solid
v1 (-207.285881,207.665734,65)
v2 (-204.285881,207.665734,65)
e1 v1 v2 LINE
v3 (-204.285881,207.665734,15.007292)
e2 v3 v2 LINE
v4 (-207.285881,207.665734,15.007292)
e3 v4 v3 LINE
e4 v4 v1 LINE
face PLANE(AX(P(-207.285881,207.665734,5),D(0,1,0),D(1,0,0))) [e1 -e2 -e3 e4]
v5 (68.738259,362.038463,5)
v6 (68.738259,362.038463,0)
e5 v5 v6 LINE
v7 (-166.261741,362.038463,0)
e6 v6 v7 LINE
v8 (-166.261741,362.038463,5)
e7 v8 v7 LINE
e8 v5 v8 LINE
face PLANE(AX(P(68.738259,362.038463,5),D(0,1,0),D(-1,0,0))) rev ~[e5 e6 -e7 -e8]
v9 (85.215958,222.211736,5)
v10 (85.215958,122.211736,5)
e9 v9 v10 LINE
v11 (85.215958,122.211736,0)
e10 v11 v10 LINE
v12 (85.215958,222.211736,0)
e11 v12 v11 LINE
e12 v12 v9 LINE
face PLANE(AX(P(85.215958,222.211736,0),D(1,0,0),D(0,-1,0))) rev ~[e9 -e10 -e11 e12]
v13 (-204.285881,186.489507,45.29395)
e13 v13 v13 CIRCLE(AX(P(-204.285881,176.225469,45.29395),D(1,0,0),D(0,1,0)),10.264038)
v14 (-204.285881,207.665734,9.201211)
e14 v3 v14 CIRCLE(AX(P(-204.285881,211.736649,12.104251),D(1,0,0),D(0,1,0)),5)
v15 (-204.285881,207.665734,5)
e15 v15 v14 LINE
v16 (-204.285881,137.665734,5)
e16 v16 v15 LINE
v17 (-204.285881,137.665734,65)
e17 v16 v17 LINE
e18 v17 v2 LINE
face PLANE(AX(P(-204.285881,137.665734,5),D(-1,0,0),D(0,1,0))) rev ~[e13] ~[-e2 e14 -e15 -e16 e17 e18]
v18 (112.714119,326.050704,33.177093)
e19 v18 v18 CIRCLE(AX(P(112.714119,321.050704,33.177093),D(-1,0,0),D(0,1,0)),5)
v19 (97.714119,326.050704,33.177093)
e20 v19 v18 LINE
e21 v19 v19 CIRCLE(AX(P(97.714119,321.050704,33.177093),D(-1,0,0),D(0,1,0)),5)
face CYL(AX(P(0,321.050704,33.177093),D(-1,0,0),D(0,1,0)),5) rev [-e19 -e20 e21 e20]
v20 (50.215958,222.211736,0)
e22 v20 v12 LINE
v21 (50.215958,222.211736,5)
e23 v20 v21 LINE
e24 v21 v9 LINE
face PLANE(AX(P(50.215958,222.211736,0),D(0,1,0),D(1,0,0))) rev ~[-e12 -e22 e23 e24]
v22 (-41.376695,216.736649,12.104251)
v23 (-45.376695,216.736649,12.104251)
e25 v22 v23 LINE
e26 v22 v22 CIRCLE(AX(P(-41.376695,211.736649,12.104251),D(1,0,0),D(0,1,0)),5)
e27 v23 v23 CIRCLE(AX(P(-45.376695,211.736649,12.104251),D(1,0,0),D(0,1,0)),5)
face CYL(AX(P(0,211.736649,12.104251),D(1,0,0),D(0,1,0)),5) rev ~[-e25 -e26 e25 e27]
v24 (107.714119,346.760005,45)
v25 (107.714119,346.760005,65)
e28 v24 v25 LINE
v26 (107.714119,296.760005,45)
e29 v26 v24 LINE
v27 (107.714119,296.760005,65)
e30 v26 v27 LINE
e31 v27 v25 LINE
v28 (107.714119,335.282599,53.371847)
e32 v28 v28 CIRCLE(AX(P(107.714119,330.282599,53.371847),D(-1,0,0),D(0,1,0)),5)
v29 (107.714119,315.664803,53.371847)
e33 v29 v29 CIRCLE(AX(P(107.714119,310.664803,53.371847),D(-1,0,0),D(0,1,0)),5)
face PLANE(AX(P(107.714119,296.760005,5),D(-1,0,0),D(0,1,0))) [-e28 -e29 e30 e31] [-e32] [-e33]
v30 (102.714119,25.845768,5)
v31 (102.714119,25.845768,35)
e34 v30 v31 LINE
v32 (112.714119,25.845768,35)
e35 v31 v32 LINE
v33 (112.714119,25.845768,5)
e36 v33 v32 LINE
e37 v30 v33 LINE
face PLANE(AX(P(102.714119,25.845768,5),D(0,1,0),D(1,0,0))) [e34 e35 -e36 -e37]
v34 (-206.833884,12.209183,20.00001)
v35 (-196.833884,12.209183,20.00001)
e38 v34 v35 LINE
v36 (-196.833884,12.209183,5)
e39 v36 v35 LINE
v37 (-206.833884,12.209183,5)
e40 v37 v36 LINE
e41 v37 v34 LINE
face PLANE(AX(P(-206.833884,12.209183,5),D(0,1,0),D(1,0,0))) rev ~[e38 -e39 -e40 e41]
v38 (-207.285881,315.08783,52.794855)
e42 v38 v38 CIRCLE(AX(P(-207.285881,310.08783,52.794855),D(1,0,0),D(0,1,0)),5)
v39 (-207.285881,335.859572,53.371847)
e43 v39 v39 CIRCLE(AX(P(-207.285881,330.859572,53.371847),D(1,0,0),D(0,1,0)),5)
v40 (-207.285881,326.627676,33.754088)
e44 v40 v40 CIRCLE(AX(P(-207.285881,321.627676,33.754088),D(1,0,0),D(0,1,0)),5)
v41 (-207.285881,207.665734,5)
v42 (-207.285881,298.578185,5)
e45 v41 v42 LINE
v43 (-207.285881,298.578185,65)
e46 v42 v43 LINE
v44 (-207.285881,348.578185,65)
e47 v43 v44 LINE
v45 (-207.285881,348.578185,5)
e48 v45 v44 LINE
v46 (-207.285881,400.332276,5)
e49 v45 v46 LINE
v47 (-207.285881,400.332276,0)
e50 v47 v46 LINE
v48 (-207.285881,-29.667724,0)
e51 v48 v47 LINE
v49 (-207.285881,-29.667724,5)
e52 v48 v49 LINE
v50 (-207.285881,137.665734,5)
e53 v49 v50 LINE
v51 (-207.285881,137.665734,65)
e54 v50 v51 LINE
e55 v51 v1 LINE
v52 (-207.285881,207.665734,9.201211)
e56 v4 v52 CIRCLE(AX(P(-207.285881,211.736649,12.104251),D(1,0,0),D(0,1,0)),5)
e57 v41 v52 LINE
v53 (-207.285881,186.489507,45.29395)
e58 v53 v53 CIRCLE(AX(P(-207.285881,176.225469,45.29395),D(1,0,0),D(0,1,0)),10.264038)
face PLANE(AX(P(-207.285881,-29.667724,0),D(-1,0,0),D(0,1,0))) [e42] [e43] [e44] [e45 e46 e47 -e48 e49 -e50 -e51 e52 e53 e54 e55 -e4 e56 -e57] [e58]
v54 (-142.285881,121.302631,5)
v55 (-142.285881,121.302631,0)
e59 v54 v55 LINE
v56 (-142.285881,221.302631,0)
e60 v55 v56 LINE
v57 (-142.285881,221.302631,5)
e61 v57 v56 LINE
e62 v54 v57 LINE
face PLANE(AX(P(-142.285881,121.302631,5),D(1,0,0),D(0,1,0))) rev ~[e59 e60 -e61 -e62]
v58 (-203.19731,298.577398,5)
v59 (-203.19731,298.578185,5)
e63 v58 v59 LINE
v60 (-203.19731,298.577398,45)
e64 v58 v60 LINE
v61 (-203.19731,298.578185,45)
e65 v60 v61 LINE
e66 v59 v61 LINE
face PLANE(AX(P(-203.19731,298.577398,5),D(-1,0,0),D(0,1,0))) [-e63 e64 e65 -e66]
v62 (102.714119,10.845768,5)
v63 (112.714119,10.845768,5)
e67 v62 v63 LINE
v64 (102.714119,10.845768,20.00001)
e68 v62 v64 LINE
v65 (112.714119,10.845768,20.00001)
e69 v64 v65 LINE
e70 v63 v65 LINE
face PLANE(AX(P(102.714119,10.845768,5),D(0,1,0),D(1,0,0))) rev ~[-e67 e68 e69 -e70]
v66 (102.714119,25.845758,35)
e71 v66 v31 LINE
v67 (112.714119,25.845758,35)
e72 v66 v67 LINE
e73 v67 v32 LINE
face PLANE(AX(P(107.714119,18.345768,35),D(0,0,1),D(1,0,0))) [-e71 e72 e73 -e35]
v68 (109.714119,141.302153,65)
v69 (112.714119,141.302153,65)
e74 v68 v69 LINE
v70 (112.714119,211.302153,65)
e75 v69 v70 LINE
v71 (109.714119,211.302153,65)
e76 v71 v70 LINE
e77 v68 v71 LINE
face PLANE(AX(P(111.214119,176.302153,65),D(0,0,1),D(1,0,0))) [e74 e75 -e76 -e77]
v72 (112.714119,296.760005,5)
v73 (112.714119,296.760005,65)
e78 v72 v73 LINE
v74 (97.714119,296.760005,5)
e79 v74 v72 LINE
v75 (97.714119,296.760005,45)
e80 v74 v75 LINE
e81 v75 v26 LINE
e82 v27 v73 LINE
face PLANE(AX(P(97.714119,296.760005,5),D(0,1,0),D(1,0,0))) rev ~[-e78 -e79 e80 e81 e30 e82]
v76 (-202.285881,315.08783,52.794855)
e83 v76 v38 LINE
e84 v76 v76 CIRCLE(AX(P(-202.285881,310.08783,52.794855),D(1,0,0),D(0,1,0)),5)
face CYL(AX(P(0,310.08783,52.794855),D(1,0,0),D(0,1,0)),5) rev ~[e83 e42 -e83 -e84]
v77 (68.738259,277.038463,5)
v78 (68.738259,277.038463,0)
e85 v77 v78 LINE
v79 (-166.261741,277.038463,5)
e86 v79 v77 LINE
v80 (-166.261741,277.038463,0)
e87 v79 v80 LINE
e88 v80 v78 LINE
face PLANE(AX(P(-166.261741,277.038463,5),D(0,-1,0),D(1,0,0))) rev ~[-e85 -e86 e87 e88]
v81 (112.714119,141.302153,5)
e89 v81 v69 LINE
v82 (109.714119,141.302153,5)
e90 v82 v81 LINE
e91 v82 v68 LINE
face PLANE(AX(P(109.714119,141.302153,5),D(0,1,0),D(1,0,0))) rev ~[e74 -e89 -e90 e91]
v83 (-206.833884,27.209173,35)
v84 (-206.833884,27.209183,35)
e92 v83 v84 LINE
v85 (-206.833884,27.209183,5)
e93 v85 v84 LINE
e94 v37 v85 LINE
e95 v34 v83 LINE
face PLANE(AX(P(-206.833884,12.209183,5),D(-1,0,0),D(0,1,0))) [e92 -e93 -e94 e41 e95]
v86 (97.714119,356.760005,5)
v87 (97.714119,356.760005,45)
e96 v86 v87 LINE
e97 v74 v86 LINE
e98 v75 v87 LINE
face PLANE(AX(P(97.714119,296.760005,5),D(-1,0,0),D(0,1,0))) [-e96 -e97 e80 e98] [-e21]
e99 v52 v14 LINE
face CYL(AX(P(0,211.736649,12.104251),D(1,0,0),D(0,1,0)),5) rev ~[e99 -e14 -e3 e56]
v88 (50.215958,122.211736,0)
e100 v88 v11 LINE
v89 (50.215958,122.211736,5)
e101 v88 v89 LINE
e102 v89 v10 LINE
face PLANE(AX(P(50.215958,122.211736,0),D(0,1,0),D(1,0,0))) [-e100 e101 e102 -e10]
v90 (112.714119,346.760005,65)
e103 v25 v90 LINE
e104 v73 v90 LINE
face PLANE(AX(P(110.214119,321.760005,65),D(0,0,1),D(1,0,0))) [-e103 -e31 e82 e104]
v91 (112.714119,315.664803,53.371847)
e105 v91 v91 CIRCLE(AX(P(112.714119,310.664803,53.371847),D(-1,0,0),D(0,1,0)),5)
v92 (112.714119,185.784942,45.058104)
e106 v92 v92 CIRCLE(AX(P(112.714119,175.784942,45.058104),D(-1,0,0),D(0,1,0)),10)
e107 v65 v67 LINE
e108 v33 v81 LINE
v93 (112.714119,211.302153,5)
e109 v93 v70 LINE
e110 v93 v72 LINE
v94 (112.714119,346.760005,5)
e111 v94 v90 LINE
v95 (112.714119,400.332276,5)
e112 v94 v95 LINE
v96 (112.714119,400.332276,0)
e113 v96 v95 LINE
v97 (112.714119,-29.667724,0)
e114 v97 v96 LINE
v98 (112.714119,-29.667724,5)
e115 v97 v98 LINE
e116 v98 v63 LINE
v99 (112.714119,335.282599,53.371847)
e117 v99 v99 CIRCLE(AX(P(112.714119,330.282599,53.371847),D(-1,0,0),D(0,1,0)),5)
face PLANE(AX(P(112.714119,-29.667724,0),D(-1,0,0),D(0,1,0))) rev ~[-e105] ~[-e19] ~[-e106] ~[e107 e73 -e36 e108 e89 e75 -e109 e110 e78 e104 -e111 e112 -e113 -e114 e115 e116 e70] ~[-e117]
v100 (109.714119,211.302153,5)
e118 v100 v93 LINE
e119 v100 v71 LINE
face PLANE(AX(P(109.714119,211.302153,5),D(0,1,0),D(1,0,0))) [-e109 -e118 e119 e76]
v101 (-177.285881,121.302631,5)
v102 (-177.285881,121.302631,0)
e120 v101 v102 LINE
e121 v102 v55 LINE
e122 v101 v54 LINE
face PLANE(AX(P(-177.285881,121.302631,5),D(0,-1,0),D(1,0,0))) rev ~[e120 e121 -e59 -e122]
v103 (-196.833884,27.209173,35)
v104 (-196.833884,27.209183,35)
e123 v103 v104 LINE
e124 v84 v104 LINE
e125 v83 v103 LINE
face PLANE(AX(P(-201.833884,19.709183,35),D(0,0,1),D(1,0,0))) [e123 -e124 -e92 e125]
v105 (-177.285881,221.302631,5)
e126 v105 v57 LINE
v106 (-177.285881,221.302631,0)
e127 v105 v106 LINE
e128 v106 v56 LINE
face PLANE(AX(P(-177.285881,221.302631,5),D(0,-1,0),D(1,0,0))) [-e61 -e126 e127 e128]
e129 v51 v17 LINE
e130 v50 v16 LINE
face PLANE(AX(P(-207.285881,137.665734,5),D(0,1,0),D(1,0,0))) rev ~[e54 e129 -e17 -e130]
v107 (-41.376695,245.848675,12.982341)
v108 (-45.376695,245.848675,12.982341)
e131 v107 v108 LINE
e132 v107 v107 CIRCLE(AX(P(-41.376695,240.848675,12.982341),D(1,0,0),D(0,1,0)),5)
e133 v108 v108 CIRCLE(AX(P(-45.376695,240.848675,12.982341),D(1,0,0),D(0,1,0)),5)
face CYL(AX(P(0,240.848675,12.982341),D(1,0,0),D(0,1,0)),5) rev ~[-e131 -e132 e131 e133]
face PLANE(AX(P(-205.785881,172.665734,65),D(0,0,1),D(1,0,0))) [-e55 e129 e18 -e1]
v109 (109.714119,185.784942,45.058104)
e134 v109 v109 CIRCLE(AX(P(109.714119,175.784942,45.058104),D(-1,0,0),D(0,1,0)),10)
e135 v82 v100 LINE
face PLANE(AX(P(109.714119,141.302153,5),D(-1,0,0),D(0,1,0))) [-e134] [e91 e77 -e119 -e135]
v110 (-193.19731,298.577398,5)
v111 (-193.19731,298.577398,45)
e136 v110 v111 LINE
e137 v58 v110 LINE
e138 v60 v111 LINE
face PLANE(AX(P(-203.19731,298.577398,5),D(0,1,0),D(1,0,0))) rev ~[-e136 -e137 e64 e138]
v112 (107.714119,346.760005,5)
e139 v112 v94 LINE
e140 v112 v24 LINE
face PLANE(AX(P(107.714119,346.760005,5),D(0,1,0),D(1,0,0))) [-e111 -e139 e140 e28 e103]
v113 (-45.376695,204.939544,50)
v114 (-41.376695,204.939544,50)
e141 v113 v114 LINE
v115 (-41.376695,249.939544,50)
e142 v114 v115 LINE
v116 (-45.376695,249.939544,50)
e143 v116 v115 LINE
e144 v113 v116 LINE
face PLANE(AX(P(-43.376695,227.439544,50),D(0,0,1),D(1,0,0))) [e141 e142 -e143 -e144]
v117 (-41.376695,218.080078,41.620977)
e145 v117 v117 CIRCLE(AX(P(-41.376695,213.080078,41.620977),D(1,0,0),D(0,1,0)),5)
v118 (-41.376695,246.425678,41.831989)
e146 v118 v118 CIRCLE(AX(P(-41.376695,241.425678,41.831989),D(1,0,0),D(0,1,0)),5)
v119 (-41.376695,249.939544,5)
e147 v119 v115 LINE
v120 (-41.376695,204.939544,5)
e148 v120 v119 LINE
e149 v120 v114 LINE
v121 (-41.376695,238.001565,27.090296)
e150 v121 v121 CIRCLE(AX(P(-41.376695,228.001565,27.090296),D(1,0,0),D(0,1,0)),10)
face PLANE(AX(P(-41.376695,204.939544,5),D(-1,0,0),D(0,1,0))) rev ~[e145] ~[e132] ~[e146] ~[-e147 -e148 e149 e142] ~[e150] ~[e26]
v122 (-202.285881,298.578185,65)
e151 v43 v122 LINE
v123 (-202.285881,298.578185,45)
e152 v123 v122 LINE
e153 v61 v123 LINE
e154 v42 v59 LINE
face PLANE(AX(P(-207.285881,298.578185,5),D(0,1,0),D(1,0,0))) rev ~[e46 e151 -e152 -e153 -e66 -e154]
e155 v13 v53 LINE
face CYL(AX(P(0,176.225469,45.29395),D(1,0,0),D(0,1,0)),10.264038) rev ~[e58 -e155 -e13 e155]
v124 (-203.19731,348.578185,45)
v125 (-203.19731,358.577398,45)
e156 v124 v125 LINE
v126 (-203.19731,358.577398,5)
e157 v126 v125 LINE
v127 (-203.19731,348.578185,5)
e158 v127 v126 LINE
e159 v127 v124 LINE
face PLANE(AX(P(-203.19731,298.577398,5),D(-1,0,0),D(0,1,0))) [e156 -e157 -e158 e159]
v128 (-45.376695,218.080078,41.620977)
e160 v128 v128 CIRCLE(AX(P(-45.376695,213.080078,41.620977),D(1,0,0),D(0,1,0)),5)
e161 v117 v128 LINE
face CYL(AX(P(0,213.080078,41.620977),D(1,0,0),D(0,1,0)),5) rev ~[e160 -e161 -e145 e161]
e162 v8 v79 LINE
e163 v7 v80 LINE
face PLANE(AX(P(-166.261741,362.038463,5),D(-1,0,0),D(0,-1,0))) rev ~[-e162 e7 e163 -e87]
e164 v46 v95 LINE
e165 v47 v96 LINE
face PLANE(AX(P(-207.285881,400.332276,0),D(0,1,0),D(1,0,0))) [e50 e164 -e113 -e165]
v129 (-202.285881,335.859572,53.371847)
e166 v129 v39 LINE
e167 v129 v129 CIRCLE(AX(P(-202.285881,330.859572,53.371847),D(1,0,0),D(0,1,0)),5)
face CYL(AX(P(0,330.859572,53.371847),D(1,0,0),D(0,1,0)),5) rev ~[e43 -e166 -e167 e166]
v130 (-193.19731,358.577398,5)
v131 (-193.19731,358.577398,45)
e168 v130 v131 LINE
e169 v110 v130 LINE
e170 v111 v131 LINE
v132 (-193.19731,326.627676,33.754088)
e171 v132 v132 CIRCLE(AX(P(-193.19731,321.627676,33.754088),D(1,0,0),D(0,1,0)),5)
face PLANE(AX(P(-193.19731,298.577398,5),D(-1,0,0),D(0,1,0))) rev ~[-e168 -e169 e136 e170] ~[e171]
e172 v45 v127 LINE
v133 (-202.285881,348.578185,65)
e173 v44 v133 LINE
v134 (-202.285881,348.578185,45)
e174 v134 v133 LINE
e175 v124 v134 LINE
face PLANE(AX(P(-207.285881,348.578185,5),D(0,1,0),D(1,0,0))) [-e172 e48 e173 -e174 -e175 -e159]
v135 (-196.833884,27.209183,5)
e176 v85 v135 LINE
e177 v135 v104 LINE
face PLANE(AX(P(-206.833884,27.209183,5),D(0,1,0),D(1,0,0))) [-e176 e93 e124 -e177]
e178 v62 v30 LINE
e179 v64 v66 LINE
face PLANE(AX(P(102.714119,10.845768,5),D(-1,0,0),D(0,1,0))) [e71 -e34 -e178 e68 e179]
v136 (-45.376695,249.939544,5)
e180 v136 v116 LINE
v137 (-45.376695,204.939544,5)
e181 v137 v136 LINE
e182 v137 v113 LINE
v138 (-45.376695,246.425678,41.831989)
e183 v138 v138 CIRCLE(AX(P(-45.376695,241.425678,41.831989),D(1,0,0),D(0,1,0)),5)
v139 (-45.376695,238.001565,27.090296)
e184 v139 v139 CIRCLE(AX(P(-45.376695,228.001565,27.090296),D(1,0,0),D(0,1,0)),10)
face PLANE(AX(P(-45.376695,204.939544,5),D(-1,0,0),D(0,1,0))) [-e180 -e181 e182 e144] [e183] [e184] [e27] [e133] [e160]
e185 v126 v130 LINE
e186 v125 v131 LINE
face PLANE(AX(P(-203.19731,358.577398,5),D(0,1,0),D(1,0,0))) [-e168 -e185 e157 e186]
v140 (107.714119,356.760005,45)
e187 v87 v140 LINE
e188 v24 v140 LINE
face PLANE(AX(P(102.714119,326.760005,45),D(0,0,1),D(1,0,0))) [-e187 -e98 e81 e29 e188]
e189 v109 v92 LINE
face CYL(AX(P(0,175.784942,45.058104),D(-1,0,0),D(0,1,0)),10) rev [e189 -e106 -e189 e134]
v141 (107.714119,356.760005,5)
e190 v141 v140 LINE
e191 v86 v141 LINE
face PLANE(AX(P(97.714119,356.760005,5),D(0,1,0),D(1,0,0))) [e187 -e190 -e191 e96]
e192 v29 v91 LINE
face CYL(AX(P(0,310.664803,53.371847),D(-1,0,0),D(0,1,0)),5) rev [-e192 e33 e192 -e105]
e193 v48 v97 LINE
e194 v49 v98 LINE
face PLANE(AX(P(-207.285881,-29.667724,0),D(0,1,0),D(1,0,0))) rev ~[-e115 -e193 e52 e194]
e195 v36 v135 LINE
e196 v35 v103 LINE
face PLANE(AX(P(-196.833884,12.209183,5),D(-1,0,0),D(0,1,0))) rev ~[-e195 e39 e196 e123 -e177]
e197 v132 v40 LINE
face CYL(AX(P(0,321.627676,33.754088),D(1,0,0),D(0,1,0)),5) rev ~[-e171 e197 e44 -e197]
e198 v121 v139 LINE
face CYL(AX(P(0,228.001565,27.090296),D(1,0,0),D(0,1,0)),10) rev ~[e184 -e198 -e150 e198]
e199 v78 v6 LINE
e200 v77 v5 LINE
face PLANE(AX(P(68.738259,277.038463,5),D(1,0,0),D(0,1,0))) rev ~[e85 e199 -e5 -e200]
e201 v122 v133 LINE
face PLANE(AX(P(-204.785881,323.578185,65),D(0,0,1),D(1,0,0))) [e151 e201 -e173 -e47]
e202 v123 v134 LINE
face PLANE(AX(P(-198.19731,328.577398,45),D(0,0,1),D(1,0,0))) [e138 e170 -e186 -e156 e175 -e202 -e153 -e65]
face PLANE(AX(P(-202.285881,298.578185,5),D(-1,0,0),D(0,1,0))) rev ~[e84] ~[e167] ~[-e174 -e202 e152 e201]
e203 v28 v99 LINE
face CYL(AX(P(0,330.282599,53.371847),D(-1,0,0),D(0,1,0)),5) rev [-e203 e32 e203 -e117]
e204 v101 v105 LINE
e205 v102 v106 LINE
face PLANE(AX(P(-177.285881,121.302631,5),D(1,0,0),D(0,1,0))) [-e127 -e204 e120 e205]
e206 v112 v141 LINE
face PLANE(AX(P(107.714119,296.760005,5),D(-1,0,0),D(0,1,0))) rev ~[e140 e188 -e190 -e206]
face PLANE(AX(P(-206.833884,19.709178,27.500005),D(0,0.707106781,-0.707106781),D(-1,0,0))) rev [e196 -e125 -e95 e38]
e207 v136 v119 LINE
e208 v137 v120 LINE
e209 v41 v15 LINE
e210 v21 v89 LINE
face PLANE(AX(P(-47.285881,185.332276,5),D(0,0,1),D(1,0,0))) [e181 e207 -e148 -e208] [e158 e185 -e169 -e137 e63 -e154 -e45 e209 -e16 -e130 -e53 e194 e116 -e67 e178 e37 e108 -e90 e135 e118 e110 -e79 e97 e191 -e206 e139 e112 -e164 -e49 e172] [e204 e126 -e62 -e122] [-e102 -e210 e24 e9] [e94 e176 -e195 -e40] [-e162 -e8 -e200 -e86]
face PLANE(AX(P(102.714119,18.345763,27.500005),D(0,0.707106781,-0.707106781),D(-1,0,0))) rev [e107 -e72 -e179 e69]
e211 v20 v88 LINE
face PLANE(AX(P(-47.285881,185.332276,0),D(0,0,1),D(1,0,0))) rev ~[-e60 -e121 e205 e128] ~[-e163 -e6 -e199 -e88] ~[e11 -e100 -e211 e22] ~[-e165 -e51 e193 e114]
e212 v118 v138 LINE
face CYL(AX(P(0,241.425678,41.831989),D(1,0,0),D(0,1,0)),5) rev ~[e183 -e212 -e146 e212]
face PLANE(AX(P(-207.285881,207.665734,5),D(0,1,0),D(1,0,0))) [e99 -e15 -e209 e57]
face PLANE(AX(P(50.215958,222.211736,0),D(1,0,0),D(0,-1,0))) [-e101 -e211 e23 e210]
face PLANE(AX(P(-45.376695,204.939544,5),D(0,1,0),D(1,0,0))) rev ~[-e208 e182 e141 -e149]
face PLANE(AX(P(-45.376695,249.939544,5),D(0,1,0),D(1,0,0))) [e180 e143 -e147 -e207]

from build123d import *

# Parameters (mm, degrees)
F0_W      = 320
F0_H      = 430
F1_DEPTH  = 5
F2_W      = 35
F2_H      = 100
F3_DEPTH  = 5
F4_W      = 35
F4_H      = 100
F5_DEPTH  = 5
F7_DEPTH  = 5
F8_W      = 3
F8_H      = 70
F9_DEPTH  = 60
F10_W     = 3
F10_H     = 70
F11_DEPTH = 60
F12_W     = 5
F12_H     = 50
F13_DEPTH = 60
F14_W     = 5
F14_H     = 50
F15_DEPTH = 60
F16_R     = 10
F17_DEPTH = 120
F18_R     = 10.2640382995
F19_DEPTH = 240
F20_W     = 10
F20_H     = 15
F21_DEPTH = 30
F22_SIZE  = 14.99999
F23_W     = 10
F23_H     = 15
F24_DEPTH = 30
F25_SIZE  = 14.99999
F26_W     = 4
F26_H     = 45
F27_DEPTH = 45
F28_W     = 10
F28_H     = 60
F29_DEPTH = 40
F30_W     = 10
F30_H     = 60
F31_DEPTH = 40
F32_R     = 5
F33_DEPTH = 240
F34_R     = 5
F35_DEPTH = 240
F36_R     = 5
F37_DEPTH = 250
F38_R     = 5
F39_DEPTH = 300
F40_R     = 5
F41_DEPTH = 300
F42_R     = 5
F43_DEPTH = 300
F44_R     = 10
F45_DEPTH = 207.2868810425
F46_R     = 5
F47_DEPTH = 207.2868810425
F48_R     = 5
F49_DEPTH = 207.2868810425
F50_R     = 5
F51_DEPTH = 207.2868810425
F52_R     = 5
F53_DEPTH = 207.2868810425


# Not quite as in the source:
# - a fillet or chamfer is up to 0.001 mm smaller than in the source, because OpenCascade refuses the exact size


with BuildPart() as f1:
    # F0 (on Top) → F1 (new body)
    with BuildSketch(Plane.XY):
        with Locations((-47.2858810425, 185.3322760761)):
            Rectangle(F0_W, F0_H)
    extrude(amount=F1_DEPTH)

    # F2 (on face) → F3 (cut)
    with BuildSketch(Plane.XY.offset(5)):
        with Locations((-159.7858810425, 171.3026314974)):
            Rectangle(F2_W, F2_H)
    extrude(amount=-F3_DEPTH, mode=Mode.SUBTRACT)

    # F4 (on face) → F5 (cut)
    with BuildSketch(Plane(origin=(0, 0, 0), x_dir=(1, 0, 0), z_dir=(0, 0, -1))):
        with Locations((67.7159577608, -172.2117364407)):
            Rectangle(F4_W, F4_H)
    extrude(amount=-F5_DEPTH, mode=Mode.SUBTRACT)

    # F6 (on face) → F7 (cut)
    with BuildSketch(Plane.XY.offset(5)):
        Polygon((68.7382593751, 362.0384633541), (-166.2617406249, 362.0384633541), (-166.2617406249, 277.0384633541), (-65.0134384632, 277.0384633541), (-48.7617406249, 277.0384633541), (68.7382593751, 277.0384633541), align=None)
    extrude(amount=-F7_DEPTH, mode=Mode.SUBTRACT)

    # F8 (on face) → F9 (join)
    with BuildSketch(Plane.XY.offset(5)):
        with Locations((-205.7858810425, 172.665733695)):
            Rectangle(F8_W, F8_H)
    extrude(amount=F9_DEPTH)

    # F10 (on face) → F11 (join)
    with BuildSketch(Plane.XY.offset(5)):
        with Locations((111.2141189575, 176.3021534681)):
            Rectangle(F10_W, F10_H)
    extrude(amount=F11_DEPTH)

    # F12 (on face) → F13 (join)
    with BuildSketch(Plane.XY.offset(5)):
        with Locations((-204.7858810425, 323.5781848431)):
            Rectangle(F12_W, F12_H)
    extrude(amount=F13_DEPTH)

    # F14 (on face) → F15 (join)
    with BuildSketch(Plane.XY.offset(5)):
        with Locations((110.2141189575, 321.7600047588)):
            Rectangle(F14_W, F14_H)
    extrude(amount=F15_DEPTH)

    # F16 (on Right) → F17 (cut)
    with BuildSketch(Plane.YZ):
        with Locations((175.784942263, 45.0581042336)):
            Circle(F16_R)
    extrude(amount=F17_DEPTH, mode=Mode.SUBTRACT)

    # F18 (on Right) → F19 (cut)
    with BuildSketch(Plane.YZ):
        with Locations((176.2254685163, 45.2939495444)):
            Circle(F18_R)
    extrude(amount=-F19_DEPTH, mode=Mode.SUBTRACT)

    # F20 (on face) → F21 (join)
    with BuildSketch(Plane.XY.offset(5)):
        with Locations((107.7141189575, 18.3457679302)):
            Rectangle(F20_W, F20_H)
    extrude(amount=F21_DEPTH)

    # F22 (size 15 in the source; OpenCascade refuses exactly that, so slightly less here)
    f22_edges = [f1.edges().sort_by_distance(p)[0] for p in [
        (107.714119, 10.845768, 35),
    ]]
    chamfer(f22_edges, length=F22_SIZE)

    # F23 (on face) → F24 (join)
    with BuildSketch(Plane.XY.offset(5)):
        with Locations((-201.83388412, 19.7091826051)):
            Rectangle(F23_W, F23_H)
    extrude(amount=F24_DEPTH)

    # F25 (size 15 in the source; OpenCascade refuses exactly that, so slightly less here)
    f25_edges = [f1.edges().sort_by_distance(p)[0] for p in [
        (-201.833884, 12.209183, 35),
    ]]
    chamfer(f25_edges, length=F25_SIZE)

    # F26 (on face) → F27 (join)
    with BuildSketch(Plane.XY.offset(5)):
        with Locations((-43.3766950369, 227.4395442009)):
            Rectangle(F26_W, F26_H)
    extrude(amount=F27_DEPTH)

    # F28 (on face) → F29 (join)
    with BuildSketch(Plane.XY.offset(5)):
        with Locations((102.7141189575, 326.7600047588)):
            Rectangle(F28_W, F28_H)
    extrude(amount=F29_DEPTH)

    # F30 (on face) → F31 (join)
    with BuildSketch(Plane.XY.offset(5)):
        with Locations((-198.1973099709, 328.5773980618)):
            Rectangle(F30_W, F30_H)
    extrude(amount=F31_DEPTH)

    # F32 (on Right) → F33 (cut)
    with BuildSketch(Plane.YZ):
        with Locations((310.6648027897, 53.3718466759)):
            Circle(F32_R)
    extrude(amount=F33_DEPTH, mode=Mode.SUBTRACT)

    # F34 (on Right) → F35 (cut)
    with BuildSketch(Plane.YZ):
        with Locations((330.2825987339, 53.3718466759)):
            Circle(F34_R)
    extrude(amount=F35_DEPTH, mode=Mode.SUBTRACT)

    # F36 (on Right) → F37 (cut)
    with BuildSketch(Plane.YZ):
        with Locations((321.0507035255, 33.1770926714)):
            Circle(F36_R)
    extrude(amount=F37_DEPTH, mode=Mode.SUBTRACT)

    # F38 (on Right) → F39 (cut)
    with BuildSketch(Plane.YZ):
        with Locations((310.0878298283, 52.794855088)):
            Circle(F38_R)
    extrude(amount=-F39_DEPTH, mode=Mode.SUBTRACT)

    # F40 (on Right) → F41 (cut)
    with BuildSketch(Plane.YZ):
        with Locations((330.8595716953, 53.3718466759)):
            Circle(F40_R)
    extrude(amount=-F41_DEPTH, mode=Mode.SUBTRACT)

    # F42 (on Right) → F43 (cut)
    with BuildSketch(Plane.YZ):
        with Locations((321.627676487, 33.7540879846)):
            Circle(F42_R)
    extrude(amount=-F43_DEPTH, mode=Mode.SUBTRACT)

    # F44 (on Right) → F45 (cut, through all)
    with BuildSketch(Plane.YZ):
        with Locations((228.0015647411, 27.0902961493)):
            Circle(F44_R)
    extrude(amount=-F45_DEPTH, mode=Mode.SUBTRACT)

    # F46 (on Right) → F47 (cut, through all)
    with BuildSketch(Plane.YZ):
        with Locations((241.425678134, 41.8319888413)):
            Circle(F46_R)
    extrude(amount=-F47_DEPTH, mode=Mode.SUBTRACT)

    # F48 (on Right) → F49 (cut, through all)
    with BuildSketch(Plane.YZ):
        with Locations((240.8486753702, 12.9823405296)):
            Circle(F48_R)
    extrude(amount=-F49_DEPTH, mode=Mode.SUBTRACT)

    # F50 (on Right) → F51 (cut, through all)
    with BuildSketch(Plane.YZ):
        with Locations((213.0800783634, 41.6209772229)):
            Circle(F50_R)
    extrude(amount=-F51_DEPTH, mode=Mode.SUBTRACT)

    # F52 (on Right) → F53 (cut, through all)
    with BuildSketch(Plane.YZ):
        with Locations((211.7366492748, 12.104251422)):
            Circle(F52_R)
    extrude(amount=-F53_DEPTH, mode=Mode.SUBTRACT)


solid = f1.part
